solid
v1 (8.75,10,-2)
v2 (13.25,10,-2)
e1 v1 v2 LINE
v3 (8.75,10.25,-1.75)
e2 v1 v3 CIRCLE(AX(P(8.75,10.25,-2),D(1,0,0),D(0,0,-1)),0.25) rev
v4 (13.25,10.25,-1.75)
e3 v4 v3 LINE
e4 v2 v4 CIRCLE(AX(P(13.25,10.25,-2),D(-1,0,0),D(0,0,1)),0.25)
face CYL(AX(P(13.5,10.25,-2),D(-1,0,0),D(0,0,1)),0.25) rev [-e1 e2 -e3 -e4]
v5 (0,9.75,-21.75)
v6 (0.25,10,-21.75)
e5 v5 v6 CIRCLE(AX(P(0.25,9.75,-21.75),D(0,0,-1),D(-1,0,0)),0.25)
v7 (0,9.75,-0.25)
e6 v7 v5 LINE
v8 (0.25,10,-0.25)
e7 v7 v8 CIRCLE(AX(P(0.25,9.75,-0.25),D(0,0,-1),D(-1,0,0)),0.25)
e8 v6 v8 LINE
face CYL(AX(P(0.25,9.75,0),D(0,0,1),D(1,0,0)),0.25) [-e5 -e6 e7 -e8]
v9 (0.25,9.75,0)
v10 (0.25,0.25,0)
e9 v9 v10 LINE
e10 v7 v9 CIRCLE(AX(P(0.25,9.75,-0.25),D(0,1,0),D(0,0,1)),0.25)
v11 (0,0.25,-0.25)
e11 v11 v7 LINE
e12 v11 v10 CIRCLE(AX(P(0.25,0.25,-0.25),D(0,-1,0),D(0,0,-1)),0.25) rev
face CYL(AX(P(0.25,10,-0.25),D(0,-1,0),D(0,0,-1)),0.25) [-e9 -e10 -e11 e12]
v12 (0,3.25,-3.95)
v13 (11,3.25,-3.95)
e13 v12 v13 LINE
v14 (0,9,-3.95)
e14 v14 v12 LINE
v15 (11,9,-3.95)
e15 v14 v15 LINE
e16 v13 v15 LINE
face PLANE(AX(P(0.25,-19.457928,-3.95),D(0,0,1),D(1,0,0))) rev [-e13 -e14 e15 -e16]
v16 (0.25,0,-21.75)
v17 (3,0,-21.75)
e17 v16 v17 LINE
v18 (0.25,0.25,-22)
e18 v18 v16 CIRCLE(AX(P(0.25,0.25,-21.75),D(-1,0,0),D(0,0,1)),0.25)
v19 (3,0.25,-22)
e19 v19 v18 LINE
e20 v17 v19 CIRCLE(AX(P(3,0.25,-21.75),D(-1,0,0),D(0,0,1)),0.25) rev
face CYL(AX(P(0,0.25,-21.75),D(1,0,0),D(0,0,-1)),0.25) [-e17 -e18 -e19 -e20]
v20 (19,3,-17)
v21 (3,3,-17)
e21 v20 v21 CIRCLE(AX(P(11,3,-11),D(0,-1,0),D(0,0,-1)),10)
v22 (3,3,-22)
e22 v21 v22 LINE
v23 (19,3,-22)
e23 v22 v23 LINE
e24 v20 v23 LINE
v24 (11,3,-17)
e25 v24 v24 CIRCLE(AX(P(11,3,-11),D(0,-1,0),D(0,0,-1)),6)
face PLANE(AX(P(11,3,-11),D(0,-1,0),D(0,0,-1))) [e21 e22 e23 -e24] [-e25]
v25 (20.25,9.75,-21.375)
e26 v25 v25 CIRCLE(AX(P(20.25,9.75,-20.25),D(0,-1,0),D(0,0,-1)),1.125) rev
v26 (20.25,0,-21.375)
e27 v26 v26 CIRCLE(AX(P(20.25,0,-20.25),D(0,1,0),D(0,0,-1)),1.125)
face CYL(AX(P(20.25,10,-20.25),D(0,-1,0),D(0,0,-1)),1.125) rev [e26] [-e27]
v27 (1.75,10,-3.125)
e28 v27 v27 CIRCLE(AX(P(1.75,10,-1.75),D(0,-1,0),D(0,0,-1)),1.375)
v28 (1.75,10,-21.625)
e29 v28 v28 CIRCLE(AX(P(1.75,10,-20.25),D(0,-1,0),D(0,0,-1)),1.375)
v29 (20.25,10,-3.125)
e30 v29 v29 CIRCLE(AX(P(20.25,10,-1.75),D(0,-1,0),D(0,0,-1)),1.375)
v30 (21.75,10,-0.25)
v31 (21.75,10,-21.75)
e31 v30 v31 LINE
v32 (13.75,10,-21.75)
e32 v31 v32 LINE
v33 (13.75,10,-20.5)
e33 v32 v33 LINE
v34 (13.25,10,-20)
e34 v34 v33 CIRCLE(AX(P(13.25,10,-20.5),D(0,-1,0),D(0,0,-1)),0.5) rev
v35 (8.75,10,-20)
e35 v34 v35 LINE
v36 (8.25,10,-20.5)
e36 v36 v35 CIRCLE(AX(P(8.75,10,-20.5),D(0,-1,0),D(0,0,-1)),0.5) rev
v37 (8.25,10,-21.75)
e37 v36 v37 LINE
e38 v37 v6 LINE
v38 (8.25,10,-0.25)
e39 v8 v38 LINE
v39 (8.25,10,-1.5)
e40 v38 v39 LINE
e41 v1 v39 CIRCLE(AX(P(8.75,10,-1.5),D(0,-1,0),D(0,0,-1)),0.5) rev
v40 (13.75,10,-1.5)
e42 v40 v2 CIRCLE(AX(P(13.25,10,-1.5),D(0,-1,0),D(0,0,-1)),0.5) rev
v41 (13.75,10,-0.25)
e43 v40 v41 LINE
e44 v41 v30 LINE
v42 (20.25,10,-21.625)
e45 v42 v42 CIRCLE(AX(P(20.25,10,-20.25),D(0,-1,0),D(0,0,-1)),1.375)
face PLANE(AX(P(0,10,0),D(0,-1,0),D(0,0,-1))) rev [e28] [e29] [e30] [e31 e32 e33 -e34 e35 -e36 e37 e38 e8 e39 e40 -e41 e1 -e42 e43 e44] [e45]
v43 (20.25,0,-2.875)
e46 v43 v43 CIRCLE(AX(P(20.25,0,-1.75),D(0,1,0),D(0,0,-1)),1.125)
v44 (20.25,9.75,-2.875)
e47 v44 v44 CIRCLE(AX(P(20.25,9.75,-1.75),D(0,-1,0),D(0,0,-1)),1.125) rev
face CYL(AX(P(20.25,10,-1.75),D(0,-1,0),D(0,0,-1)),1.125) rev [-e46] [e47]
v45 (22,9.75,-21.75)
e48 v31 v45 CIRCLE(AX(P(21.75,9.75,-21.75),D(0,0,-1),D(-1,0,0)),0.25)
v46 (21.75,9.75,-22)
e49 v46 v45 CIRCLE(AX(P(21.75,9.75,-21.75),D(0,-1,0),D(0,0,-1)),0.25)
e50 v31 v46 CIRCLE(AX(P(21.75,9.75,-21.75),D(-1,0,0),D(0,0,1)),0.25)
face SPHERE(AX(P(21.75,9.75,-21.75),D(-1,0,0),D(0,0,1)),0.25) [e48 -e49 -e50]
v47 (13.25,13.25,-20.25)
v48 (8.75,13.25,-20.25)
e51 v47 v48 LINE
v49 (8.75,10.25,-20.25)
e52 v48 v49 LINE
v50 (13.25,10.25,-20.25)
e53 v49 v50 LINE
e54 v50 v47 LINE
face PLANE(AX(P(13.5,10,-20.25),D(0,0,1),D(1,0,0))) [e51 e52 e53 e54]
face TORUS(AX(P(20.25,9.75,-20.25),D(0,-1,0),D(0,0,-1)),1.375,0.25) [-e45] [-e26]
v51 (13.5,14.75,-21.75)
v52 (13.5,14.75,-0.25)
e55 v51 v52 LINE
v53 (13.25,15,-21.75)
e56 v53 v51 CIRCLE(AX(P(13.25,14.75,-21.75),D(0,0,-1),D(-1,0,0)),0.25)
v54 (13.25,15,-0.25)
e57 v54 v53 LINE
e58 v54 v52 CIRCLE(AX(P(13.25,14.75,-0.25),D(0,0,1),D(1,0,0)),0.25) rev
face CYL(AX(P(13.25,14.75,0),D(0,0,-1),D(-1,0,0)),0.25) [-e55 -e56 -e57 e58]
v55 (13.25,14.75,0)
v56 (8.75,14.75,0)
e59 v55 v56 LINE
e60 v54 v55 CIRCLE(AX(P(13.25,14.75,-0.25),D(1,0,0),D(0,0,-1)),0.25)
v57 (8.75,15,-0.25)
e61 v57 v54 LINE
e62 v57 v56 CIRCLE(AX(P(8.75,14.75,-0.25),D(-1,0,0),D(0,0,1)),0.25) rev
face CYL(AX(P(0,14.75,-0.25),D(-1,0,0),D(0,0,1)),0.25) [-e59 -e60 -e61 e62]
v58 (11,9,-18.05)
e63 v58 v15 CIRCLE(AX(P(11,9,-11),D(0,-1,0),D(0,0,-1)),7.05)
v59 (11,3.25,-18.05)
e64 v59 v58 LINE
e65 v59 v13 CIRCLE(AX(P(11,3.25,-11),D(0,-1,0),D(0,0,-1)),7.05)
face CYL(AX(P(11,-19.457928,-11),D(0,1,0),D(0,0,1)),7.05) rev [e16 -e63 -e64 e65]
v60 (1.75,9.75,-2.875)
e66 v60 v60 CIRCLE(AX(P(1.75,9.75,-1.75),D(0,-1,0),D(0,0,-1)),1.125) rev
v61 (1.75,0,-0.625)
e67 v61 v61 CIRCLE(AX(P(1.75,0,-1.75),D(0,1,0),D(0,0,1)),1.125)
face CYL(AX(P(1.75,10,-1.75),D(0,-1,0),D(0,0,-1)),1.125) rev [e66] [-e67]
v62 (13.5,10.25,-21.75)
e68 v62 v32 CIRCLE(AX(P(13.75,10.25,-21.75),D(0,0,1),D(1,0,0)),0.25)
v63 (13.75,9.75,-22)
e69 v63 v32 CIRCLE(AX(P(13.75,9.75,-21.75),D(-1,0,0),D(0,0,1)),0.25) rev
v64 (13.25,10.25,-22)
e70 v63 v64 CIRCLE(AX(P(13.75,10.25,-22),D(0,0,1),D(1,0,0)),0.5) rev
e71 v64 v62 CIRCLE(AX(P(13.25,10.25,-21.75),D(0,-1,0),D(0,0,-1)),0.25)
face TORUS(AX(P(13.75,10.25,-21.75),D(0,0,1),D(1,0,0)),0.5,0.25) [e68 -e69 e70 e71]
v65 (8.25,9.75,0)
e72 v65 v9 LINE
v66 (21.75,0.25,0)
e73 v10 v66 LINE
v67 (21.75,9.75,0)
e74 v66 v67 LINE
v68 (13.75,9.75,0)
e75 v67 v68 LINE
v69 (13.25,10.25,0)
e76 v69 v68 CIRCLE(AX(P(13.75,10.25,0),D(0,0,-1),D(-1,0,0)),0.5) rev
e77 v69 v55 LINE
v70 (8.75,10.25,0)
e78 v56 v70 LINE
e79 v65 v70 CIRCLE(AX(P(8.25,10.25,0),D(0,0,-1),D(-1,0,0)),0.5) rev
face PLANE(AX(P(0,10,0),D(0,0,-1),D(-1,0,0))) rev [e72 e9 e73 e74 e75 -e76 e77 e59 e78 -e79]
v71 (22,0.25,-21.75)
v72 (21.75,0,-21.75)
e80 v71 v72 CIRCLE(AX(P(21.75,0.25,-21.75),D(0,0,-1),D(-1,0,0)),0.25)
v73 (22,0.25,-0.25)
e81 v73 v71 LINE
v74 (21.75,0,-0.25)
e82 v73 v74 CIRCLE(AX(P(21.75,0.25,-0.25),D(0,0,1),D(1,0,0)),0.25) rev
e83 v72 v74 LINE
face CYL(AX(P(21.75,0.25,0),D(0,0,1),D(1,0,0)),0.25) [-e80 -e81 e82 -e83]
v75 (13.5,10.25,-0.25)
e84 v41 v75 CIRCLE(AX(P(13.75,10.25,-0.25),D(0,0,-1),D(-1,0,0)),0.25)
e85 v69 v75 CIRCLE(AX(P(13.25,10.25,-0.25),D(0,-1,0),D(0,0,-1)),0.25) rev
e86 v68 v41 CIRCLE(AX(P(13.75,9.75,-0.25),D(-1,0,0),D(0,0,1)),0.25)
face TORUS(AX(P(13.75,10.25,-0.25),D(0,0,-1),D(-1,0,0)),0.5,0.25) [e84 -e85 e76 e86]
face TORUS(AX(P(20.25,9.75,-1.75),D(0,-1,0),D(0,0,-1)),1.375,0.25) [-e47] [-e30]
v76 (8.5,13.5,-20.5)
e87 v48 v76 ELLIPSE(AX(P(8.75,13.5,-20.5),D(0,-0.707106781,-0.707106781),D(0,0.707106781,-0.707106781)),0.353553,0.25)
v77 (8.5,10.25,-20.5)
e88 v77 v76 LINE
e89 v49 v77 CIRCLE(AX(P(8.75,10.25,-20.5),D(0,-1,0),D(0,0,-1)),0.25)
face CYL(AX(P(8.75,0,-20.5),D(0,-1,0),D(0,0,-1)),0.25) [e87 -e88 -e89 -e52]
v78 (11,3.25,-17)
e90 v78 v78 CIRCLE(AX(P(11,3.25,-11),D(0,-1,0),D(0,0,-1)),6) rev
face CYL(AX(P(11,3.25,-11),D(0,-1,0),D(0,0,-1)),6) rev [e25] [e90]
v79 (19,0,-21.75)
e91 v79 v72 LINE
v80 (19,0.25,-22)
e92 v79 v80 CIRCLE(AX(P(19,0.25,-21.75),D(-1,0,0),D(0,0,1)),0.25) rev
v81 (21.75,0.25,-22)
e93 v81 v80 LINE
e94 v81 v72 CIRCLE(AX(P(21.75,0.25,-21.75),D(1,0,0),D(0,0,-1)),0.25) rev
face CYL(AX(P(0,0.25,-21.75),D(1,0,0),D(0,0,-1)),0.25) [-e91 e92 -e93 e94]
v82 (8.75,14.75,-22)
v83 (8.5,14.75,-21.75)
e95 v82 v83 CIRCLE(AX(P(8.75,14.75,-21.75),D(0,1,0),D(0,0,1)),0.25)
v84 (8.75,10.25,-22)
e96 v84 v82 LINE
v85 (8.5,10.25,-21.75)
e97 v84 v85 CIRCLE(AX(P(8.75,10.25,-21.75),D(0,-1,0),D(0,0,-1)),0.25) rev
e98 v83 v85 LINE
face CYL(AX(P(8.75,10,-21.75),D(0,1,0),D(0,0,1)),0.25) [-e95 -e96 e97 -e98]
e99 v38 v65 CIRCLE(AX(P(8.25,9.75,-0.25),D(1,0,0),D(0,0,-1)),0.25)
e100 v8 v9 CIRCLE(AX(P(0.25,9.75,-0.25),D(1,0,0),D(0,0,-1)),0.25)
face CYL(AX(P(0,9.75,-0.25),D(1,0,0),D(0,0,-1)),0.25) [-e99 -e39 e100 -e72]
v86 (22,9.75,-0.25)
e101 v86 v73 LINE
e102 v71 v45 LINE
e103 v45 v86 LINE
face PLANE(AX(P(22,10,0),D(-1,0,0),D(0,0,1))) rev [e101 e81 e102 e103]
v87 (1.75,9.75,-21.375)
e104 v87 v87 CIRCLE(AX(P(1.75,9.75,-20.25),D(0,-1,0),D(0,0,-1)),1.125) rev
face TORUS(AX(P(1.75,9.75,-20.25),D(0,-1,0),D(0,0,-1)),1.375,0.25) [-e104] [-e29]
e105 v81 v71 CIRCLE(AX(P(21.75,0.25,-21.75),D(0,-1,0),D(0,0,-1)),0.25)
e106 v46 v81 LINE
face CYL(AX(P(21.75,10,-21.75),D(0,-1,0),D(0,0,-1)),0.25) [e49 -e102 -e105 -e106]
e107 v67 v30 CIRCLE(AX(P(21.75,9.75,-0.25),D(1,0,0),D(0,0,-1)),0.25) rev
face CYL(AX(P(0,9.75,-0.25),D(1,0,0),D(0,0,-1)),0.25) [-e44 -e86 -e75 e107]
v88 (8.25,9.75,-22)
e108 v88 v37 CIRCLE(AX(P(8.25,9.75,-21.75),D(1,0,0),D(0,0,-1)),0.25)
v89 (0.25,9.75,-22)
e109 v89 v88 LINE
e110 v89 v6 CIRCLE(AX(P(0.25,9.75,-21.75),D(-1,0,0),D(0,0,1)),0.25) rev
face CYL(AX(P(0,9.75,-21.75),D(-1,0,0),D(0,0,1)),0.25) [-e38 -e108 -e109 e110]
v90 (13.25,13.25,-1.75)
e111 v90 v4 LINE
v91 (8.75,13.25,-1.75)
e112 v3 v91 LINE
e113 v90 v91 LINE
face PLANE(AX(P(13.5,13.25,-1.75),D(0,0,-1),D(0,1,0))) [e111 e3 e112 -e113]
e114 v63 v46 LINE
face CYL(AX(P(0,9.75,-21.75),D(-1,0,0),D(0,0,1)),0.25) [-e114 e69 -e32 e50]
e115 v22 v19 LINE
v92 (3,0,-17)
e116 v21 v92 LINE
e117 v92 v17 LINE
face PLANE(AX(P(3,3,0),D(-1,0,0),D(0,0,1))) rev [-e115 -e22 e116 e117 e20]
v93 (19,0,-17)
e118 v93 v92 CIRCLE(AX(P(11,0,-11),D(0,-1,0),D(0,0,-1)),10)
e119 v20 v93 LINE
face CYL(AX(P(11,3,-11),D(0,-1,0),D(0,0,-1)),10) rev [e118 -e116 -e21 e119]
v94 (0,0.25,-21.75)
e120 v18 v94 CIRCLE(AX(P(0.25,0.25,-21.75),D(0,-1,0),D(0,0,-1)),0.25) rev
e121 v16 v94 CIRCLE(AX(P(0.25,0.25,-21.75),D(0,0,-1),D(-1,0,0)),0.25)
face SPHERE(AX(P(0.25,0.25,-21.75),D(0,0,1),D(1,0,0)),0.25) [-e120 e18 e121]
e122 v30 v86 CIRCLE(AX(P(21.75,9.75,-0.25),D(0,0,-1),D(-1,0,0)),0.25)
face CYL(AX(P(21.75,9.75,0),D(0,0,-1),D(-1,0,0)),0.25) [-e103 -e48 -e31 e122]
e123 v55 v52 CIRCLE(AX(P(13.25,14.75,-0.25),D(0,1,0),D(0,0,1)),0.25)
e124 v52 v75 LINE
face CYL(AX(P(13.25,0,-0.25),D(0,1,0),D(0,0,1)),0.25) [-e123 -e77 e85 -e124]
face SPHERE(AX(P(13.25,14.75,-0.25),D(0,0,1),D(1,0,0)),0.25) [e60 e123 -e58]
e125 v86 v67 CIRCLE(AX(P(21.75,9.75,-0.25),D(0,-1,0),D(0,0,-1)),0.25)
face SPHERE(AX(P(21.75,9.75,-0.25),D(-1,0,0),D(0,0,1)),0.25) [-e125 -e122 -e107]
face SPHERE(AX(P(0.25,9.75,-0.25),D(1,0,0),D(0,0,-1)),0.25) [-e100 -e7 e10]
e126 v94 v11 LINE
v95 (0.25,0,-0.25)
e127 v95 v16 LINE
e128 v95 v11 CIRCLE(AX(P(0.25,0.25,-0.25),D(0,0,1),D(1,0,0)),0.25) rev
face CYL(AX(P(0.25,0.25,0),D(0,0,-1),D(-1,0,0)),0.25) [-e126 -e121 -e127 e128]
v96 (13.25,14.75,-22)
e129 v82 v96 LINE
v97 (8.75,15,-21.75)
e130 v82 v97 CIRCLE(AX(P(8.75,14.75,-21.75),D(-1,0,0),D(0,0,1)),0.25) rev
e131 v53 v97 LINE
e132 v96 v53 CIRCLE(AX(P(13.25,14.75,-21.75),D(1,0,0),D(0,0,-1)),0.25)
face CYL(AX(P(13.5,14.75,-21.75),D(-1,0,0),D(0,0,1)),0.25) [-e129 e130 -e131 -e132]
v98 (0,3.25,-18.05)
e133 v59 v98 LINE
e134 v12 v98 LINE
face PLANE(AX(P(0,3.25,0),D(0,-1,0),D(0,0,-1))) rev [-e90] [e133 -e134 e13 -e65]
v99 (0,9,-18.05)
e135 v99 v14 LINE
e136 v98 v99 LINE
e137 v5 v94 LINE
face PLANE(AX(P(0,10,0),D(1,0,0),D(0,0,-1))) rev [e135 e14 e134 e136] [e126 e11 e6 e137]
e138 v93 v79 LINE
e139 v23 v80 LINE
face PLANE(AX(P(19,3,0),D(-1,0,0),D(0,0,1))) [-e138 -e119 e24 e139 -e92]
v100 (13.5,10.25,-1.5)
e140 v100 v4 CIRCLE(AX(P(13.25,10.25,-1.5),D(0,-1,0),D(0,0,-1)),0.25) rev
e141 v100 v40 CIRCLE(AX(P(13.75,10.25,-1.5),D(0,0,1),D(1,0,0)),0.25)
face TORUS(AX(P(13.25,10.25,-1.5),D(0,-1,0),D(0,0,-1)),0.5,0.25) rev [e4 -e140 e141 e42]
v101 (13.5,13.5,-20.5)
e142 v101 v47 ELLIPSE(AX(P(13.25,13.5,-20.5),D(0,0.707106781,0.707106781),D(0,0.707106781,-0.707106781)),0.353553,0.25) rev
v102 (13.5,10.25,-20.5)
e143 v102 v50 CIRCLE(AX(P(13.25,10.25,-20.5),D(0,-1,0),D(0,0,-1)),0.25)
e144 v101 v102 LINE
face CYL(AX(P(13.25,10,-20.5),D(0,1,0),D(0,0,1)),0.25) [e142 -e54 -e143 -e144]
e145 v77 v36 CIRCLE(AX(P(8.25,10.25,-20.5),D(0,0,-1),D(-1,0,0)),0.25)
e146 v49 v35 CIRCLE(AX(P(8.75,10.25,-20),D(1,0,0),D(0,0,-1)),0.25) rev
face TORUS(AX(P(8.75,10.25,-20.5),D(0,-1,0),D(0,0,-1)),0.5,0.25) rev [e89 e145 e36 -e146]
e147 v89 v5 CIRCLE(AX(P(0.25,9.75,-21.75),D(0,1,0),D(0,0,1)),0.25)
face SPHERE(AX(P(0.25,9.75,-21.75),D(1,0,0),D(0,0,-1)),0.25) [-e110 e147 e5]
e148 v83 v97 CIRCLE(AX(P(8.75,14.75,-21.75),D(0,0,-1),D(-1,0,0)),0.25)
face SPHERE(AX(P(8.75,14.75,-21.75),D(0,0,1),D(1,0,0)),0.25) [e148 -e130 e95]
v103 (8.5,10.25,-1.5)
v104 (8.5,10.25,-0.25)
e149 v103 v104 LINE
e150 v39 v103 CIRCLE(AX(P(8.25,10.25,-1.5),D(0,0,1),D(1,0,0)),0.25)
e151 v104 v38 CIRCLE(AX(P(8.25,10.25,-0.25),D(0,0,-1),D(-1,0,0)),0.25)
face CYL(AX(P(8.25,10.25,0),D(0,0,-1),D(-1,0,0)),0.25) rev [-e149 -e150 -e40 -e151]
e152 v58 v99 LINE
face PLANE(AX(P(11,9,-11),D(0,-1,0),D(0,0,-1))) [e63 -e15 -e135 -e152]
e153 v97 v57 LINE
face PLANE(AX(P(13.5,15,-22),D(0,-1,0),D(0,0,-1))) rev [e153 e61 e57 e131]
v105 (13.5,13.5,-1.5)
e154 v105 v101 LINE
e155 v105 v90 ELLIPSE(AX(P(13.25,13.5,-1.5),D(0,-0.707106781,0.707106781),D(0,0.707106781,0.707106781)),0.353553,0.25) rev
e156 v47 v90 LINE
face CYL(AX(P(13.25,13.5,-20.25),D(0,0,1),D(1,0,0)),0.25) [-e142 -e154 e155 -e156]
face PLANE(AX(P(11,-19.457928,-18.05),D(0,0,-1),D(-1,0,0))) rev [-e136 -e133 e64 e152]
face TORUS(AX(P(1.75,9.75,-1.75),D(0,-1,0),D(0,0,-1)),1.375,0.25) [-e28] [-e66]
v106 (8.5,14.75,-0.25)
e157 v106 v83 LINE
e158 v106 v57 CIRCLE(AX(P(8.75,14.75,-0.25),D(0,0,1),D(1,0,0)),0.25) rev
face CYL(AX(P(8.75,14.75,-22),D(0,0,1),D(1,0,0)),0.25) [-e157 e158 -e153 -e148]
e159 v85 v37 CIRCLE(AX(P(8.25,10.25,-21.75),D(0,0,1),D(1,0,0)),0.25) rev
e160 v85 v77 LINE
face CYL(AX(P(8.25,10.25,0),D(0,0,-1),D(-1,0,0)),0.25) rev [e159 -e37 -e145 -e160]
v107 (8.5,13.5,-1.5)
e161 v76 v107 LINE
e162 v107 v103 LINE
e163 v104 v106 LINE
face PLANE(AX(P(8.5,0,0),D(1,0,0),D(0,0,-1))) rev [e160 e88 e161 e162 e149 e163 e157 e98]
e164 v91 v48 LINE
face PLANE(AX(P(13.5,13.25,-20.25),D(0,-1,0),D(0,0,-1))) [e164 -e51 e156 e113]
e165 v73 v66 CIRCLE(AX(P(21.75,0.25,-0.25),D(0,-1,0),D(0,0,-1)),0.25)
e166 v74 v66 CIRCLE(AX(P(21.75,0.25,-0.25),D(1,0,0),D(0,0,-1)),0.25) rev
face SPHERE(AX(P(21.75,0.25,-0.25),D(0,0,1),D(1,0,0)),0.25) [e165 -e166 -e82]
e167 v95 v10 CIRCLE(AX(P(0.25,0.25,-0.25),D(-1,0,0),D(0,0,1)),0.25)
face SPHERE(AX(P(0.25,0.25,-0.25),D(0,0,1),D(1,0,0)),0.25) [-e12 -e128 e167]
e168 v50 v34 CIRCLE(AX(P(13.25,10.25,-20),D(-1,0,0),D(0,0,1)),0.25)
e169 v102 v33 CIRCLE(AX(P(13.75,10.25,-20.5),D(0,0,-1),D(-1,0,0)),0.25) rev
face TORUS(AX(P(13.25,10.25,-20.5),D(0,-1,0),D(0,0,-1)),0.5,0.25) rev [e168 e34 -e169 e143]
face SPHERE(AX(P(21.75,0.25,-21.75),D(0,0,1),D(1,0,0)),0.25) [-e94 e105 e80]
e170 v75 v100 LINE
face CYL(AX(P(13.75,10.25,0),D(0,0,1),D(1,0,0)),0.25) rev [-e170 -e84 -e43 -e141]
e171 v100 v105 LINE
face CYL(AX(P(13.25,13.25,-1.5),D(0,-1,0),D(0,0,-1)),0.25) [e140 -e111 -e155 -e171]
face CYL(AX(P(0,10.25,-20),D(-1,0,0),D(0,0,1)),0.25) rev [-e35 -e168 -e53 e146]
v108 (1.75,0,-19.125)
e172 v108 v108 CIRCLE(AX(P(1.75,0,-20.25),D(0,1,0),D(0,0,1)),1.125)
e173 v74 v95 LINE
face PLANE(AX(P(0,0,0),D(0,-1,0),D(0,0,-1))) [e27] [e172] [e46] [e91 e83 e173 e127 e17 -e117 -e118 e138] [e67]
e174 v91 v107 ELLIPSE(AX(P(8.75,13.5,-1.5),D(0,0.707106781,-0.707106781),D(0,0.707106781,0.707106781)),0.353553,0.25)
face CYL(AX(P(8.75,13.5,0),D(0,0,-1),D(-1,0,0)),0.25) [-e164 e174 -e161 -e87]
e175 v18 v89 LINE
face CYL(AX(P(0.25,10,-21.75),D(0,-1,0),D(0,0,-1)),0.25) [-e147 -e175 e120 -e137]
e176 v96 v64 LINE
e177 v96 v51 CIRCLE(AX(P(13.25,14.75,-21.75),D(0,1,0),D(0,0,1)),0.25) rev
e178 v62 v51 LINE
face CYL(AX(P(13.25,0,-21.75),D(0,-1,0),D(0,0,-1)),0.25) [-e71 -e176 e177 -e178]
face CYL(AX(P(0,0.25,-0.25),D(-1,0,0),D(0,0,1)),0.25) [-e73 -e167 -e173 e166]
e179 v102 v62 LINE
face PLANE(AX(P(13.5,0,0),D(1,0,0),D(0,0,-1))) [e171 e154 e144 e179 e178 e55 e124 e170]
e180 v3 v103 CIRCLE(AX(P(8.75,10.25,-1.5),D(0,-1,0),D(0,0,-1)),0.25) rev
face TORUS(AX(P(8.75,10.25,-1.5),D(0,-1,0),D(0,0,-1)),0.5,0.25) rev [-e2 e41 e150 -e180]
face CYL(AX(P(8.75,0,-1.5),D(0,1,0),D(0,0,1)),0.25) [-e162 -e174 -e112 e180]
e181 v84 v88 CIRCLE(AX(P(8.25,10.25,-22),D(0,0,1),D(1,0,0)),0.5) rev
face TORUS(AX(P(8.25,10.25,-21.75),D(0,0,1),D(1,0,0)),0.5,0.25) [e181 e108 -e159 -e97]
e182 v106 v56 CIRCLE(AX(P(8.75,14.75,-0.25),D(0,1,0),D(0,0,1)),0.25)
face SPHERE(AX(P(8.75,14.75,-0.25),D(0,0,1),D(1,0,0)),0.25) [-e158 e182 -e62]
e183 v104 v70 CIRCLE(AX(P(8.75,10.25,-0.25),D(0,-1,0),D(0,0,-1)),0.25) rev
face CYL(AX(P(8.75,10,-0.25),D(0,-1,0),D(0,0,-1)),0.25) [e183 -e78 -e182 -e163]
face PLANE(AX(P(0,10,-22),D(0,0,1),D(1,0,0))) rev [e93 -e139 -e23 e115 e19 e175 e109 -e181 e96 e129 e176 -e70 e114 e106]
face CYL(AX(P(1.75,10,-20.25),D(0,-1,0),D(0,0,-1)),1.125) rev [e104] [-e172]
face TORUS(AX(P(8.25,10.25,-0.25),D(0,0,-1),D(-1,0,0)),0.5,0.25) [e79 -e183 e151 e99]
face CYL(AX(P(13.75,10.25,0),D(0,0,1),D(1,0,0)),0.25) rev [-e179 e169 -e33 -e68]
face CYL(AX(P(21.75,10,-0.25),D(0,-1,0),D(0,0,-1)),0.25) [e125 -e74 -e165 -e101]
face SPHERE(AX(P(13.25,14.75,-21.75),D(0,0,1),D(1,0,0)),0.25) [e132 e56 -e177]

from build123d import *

# Parameters (mm, degrees)
SKETCH1_W                = 22
SKETCH1_H                = 22
SKETCH1_R                = 1.125
BOSS_EXTRUDE1_DEPTH      = 10
BOSS_EXTRUDE2_DEPTH      = 2.5
BOSS_EXTRUDE2_DEPTH_BACK = 2.5
FILLET1_R                = 0.25
FILLET2_R                = 0.25
SKETCH3_R                = 10
CUT_EXTRUDE1_DEPTH       = 3
SKETCH4_R                = 6
CUT_EXTRUDE2_DEPTH       = 0.25
CUT_EXTRUDE4_DEPTH       = 5.75
SKETCH6_W                = 14.1
SKETCH6_H                = 5.75
CUT_EXTRUDE5_DEPTH       = 10
CUT_EXTRUDE6_START       = -3
CUT_EXTRUDE6_DEPTH       = 3


# Read off the part's stored shape, not the designer's step: Cut-Extrude6
with BuildPart() as part:
    # Sketch1 → Boss-Extrude1 (new body)
    with BuildSketch(Plane(origin=(0, 0, 0), x_dir=(1, 0, 0), z_dir=(0, 1, 0))):
        with Locations((11, 11)):
            Rectangle(SKETCH1_W, SKETCH1_H)
        with Locations(Location((1.75, 20.25, 0), (0, 0, 270))):
            Circle(SKETCH1_R, mode=Mode.SUBTRACT)
        with Locations(Location((1.75, 1.75, 0), (0, 0, 270))):
            Circle(SKETCH1_R, mode=Mode.SUBTRACT)
        with Locations(Location((20.25, 1.75, 0), (0, 0, 90))):
            Circle(SKETCH1_R, mode=Mode.SUBTRACT)
        with Locations(Location((20.25, 20.25, 0), (0, 0, 90))):
            Circle(SKETCH1_R, mode=Mode.SUBTRACT)
    extrude(amount=BOSS_EXTRUDE1_DEPTH)

    # Sketch2 → Boss-Extrude2 (add, two sides: drawn at the far end of the back side and taken through both)
    with BuildSketch(Plane.ZY.offset(-11).offset(-BOSS_EXTRUDE2_DEPTH_BACK)):
        Polygon((-22, 10), (-22, 15), (0, 15), (0, 10), (-1.75, 10), (-1.75, 13.25), (-20.25, 13.25), (-20.25, 10), align=None)
    extrude(amount=BOSS_EXTRUDE2_DEPTH + BOSS_EXTRUDE2_DEPTH_BACK)

    # Fillet1
    fillet1_edges = [part.edges().sort_by_distance(p)[0] for p in [
        (17.75, 10, -22),
        (4.25, 10, -22),
        (17.75, 10, 0),
        (13.5, 11.625, -20.25),
        (11, 10, -20.25),
        (13.5, 10, -21.125),
        (8.5, 12.5, -22),
        (11, 15, -22),
        (8.5, 15, -11),
        (11, 15, 0),
        (8.5, 12.5, 0),
        (13.5, 10, -0.875),
        (11, 10, -1.75),
        (13.5, 11.625, -1.75),
        (13.5, 13.25, -11),
        (13.5, 12.5, -22),
        (13.5, 15, -11),
        (13.5, 12.5, 0),
        (8.5, 11.625, -20.25),
        (8.5, 13.25, -11),
        (8.5, 11.625, -1.75),
        (8.5, 10, -0.875),
        (8.5, 10, -21.125),
        (4.25, 10, 0),
    ]]
    fillet(fillet1_edges, radius=FILLET1_R)

    # Fillet2
    fillet2_edges = [part.edges().sort_by_distance(p)[0] for p in [
        (1.75, 10, -21.375),
        (1.75, 10, -2.875),
        (20.25, 10, -0.625),
        (20.25, 10, -19.125),
        (11, 0, -22),
        (22, 0, -11),
        (11, 0, 0),
        (0, 10, -11),
        (22, 10, -11),
        (0, 0, -11),
        (0, 4.875, -22),
        (22, 4.875, -22),
        (22, 4.875, 0),
        (22, 9.926776695, -0.073223305),
        (22, 9.926776695, -21.926776695),
        (0, 4.875, 0),
        (0, 9.926776695, -21.926776695),
        (0, 9.926776695, -0.073223305),
    ]]
    fillet(fillet2_edges, radius=FILLET2_R)

    # Sketch3 → Cut-Extrude1 (cut)
    with BuildSketch(Plane.XZ):
        with Locations(Location((11, -11, 0), (0, 0, 270))):
            Circle(SKETCH3_R)
    extrude(amount=-CUT_EXTRUDE1_DEPTH, mode=Mode.SUBTRACT)

    # Sketch4 → Cut-Extrude2 (cut)
    with BuildSketch(Plane.XZ.offset(-3)):
        with Locations(Location((11, -11, 0), (0, 0, 270))):
            Circle(SKETCH4_R)
    extrude(amount=-CUT_EXTRUDE2_DEPTH, mode=Mode.SUBTRACT)

    # Sketch5 → Cut-Extrude4 (cut)
    with BuildSketch(Plane(origin=(0, 9, 0), x_dir=(1, 0, 0), z_dir=(0, 1, 0))):
        with BuildLine():
            Line((11, 18.05), (0.25, 18.05))
            Line((0.25, 18.05), (0.25, 3.95))
            Line((0.25, 3.95), (11, 3.95))
            ThreePointArc((11, 3.95), (18.05, 11), (11, 18.05))
        make_face()
    extrude(amount=-CUT_EXTRUDE4_DEPTH, mode=Mode.SUBTRACT)

    # Sketch6 → Cut-Extrude5 (cut)
    with BuildSketch(Plane(origin=(0.25, 0, 0), x_dir=(0, 0, -1), z_dir=(1, 0, 0))):
        with Locations((11, 6.125)):
            Rectangle(SKETCH6_W, SKETCH6_H)
    extrude(amount=-CUT_EXTRUDE5_DEPTH, mode=Mode.SUBTRACT)

    # Cut-Extrude6 outline → Cut-Extrude6 (cut)
    with BuildSketch(Plane.XZ.offset(CUT_EXTRUDE6_START)):
        with BuildLine():
            Line((19, -22), (19, -17))
            ThreePointArc((19, -17), (11, -21), (3, -17))
            Line((3, -17), (3, -22))
            Line((3, -22), (19, -22))
        make_face()
    extrude(amount=CUT_EXTRUDE6_DEPTH, mode=Mode.SUBTRACT)


solid = part.part
